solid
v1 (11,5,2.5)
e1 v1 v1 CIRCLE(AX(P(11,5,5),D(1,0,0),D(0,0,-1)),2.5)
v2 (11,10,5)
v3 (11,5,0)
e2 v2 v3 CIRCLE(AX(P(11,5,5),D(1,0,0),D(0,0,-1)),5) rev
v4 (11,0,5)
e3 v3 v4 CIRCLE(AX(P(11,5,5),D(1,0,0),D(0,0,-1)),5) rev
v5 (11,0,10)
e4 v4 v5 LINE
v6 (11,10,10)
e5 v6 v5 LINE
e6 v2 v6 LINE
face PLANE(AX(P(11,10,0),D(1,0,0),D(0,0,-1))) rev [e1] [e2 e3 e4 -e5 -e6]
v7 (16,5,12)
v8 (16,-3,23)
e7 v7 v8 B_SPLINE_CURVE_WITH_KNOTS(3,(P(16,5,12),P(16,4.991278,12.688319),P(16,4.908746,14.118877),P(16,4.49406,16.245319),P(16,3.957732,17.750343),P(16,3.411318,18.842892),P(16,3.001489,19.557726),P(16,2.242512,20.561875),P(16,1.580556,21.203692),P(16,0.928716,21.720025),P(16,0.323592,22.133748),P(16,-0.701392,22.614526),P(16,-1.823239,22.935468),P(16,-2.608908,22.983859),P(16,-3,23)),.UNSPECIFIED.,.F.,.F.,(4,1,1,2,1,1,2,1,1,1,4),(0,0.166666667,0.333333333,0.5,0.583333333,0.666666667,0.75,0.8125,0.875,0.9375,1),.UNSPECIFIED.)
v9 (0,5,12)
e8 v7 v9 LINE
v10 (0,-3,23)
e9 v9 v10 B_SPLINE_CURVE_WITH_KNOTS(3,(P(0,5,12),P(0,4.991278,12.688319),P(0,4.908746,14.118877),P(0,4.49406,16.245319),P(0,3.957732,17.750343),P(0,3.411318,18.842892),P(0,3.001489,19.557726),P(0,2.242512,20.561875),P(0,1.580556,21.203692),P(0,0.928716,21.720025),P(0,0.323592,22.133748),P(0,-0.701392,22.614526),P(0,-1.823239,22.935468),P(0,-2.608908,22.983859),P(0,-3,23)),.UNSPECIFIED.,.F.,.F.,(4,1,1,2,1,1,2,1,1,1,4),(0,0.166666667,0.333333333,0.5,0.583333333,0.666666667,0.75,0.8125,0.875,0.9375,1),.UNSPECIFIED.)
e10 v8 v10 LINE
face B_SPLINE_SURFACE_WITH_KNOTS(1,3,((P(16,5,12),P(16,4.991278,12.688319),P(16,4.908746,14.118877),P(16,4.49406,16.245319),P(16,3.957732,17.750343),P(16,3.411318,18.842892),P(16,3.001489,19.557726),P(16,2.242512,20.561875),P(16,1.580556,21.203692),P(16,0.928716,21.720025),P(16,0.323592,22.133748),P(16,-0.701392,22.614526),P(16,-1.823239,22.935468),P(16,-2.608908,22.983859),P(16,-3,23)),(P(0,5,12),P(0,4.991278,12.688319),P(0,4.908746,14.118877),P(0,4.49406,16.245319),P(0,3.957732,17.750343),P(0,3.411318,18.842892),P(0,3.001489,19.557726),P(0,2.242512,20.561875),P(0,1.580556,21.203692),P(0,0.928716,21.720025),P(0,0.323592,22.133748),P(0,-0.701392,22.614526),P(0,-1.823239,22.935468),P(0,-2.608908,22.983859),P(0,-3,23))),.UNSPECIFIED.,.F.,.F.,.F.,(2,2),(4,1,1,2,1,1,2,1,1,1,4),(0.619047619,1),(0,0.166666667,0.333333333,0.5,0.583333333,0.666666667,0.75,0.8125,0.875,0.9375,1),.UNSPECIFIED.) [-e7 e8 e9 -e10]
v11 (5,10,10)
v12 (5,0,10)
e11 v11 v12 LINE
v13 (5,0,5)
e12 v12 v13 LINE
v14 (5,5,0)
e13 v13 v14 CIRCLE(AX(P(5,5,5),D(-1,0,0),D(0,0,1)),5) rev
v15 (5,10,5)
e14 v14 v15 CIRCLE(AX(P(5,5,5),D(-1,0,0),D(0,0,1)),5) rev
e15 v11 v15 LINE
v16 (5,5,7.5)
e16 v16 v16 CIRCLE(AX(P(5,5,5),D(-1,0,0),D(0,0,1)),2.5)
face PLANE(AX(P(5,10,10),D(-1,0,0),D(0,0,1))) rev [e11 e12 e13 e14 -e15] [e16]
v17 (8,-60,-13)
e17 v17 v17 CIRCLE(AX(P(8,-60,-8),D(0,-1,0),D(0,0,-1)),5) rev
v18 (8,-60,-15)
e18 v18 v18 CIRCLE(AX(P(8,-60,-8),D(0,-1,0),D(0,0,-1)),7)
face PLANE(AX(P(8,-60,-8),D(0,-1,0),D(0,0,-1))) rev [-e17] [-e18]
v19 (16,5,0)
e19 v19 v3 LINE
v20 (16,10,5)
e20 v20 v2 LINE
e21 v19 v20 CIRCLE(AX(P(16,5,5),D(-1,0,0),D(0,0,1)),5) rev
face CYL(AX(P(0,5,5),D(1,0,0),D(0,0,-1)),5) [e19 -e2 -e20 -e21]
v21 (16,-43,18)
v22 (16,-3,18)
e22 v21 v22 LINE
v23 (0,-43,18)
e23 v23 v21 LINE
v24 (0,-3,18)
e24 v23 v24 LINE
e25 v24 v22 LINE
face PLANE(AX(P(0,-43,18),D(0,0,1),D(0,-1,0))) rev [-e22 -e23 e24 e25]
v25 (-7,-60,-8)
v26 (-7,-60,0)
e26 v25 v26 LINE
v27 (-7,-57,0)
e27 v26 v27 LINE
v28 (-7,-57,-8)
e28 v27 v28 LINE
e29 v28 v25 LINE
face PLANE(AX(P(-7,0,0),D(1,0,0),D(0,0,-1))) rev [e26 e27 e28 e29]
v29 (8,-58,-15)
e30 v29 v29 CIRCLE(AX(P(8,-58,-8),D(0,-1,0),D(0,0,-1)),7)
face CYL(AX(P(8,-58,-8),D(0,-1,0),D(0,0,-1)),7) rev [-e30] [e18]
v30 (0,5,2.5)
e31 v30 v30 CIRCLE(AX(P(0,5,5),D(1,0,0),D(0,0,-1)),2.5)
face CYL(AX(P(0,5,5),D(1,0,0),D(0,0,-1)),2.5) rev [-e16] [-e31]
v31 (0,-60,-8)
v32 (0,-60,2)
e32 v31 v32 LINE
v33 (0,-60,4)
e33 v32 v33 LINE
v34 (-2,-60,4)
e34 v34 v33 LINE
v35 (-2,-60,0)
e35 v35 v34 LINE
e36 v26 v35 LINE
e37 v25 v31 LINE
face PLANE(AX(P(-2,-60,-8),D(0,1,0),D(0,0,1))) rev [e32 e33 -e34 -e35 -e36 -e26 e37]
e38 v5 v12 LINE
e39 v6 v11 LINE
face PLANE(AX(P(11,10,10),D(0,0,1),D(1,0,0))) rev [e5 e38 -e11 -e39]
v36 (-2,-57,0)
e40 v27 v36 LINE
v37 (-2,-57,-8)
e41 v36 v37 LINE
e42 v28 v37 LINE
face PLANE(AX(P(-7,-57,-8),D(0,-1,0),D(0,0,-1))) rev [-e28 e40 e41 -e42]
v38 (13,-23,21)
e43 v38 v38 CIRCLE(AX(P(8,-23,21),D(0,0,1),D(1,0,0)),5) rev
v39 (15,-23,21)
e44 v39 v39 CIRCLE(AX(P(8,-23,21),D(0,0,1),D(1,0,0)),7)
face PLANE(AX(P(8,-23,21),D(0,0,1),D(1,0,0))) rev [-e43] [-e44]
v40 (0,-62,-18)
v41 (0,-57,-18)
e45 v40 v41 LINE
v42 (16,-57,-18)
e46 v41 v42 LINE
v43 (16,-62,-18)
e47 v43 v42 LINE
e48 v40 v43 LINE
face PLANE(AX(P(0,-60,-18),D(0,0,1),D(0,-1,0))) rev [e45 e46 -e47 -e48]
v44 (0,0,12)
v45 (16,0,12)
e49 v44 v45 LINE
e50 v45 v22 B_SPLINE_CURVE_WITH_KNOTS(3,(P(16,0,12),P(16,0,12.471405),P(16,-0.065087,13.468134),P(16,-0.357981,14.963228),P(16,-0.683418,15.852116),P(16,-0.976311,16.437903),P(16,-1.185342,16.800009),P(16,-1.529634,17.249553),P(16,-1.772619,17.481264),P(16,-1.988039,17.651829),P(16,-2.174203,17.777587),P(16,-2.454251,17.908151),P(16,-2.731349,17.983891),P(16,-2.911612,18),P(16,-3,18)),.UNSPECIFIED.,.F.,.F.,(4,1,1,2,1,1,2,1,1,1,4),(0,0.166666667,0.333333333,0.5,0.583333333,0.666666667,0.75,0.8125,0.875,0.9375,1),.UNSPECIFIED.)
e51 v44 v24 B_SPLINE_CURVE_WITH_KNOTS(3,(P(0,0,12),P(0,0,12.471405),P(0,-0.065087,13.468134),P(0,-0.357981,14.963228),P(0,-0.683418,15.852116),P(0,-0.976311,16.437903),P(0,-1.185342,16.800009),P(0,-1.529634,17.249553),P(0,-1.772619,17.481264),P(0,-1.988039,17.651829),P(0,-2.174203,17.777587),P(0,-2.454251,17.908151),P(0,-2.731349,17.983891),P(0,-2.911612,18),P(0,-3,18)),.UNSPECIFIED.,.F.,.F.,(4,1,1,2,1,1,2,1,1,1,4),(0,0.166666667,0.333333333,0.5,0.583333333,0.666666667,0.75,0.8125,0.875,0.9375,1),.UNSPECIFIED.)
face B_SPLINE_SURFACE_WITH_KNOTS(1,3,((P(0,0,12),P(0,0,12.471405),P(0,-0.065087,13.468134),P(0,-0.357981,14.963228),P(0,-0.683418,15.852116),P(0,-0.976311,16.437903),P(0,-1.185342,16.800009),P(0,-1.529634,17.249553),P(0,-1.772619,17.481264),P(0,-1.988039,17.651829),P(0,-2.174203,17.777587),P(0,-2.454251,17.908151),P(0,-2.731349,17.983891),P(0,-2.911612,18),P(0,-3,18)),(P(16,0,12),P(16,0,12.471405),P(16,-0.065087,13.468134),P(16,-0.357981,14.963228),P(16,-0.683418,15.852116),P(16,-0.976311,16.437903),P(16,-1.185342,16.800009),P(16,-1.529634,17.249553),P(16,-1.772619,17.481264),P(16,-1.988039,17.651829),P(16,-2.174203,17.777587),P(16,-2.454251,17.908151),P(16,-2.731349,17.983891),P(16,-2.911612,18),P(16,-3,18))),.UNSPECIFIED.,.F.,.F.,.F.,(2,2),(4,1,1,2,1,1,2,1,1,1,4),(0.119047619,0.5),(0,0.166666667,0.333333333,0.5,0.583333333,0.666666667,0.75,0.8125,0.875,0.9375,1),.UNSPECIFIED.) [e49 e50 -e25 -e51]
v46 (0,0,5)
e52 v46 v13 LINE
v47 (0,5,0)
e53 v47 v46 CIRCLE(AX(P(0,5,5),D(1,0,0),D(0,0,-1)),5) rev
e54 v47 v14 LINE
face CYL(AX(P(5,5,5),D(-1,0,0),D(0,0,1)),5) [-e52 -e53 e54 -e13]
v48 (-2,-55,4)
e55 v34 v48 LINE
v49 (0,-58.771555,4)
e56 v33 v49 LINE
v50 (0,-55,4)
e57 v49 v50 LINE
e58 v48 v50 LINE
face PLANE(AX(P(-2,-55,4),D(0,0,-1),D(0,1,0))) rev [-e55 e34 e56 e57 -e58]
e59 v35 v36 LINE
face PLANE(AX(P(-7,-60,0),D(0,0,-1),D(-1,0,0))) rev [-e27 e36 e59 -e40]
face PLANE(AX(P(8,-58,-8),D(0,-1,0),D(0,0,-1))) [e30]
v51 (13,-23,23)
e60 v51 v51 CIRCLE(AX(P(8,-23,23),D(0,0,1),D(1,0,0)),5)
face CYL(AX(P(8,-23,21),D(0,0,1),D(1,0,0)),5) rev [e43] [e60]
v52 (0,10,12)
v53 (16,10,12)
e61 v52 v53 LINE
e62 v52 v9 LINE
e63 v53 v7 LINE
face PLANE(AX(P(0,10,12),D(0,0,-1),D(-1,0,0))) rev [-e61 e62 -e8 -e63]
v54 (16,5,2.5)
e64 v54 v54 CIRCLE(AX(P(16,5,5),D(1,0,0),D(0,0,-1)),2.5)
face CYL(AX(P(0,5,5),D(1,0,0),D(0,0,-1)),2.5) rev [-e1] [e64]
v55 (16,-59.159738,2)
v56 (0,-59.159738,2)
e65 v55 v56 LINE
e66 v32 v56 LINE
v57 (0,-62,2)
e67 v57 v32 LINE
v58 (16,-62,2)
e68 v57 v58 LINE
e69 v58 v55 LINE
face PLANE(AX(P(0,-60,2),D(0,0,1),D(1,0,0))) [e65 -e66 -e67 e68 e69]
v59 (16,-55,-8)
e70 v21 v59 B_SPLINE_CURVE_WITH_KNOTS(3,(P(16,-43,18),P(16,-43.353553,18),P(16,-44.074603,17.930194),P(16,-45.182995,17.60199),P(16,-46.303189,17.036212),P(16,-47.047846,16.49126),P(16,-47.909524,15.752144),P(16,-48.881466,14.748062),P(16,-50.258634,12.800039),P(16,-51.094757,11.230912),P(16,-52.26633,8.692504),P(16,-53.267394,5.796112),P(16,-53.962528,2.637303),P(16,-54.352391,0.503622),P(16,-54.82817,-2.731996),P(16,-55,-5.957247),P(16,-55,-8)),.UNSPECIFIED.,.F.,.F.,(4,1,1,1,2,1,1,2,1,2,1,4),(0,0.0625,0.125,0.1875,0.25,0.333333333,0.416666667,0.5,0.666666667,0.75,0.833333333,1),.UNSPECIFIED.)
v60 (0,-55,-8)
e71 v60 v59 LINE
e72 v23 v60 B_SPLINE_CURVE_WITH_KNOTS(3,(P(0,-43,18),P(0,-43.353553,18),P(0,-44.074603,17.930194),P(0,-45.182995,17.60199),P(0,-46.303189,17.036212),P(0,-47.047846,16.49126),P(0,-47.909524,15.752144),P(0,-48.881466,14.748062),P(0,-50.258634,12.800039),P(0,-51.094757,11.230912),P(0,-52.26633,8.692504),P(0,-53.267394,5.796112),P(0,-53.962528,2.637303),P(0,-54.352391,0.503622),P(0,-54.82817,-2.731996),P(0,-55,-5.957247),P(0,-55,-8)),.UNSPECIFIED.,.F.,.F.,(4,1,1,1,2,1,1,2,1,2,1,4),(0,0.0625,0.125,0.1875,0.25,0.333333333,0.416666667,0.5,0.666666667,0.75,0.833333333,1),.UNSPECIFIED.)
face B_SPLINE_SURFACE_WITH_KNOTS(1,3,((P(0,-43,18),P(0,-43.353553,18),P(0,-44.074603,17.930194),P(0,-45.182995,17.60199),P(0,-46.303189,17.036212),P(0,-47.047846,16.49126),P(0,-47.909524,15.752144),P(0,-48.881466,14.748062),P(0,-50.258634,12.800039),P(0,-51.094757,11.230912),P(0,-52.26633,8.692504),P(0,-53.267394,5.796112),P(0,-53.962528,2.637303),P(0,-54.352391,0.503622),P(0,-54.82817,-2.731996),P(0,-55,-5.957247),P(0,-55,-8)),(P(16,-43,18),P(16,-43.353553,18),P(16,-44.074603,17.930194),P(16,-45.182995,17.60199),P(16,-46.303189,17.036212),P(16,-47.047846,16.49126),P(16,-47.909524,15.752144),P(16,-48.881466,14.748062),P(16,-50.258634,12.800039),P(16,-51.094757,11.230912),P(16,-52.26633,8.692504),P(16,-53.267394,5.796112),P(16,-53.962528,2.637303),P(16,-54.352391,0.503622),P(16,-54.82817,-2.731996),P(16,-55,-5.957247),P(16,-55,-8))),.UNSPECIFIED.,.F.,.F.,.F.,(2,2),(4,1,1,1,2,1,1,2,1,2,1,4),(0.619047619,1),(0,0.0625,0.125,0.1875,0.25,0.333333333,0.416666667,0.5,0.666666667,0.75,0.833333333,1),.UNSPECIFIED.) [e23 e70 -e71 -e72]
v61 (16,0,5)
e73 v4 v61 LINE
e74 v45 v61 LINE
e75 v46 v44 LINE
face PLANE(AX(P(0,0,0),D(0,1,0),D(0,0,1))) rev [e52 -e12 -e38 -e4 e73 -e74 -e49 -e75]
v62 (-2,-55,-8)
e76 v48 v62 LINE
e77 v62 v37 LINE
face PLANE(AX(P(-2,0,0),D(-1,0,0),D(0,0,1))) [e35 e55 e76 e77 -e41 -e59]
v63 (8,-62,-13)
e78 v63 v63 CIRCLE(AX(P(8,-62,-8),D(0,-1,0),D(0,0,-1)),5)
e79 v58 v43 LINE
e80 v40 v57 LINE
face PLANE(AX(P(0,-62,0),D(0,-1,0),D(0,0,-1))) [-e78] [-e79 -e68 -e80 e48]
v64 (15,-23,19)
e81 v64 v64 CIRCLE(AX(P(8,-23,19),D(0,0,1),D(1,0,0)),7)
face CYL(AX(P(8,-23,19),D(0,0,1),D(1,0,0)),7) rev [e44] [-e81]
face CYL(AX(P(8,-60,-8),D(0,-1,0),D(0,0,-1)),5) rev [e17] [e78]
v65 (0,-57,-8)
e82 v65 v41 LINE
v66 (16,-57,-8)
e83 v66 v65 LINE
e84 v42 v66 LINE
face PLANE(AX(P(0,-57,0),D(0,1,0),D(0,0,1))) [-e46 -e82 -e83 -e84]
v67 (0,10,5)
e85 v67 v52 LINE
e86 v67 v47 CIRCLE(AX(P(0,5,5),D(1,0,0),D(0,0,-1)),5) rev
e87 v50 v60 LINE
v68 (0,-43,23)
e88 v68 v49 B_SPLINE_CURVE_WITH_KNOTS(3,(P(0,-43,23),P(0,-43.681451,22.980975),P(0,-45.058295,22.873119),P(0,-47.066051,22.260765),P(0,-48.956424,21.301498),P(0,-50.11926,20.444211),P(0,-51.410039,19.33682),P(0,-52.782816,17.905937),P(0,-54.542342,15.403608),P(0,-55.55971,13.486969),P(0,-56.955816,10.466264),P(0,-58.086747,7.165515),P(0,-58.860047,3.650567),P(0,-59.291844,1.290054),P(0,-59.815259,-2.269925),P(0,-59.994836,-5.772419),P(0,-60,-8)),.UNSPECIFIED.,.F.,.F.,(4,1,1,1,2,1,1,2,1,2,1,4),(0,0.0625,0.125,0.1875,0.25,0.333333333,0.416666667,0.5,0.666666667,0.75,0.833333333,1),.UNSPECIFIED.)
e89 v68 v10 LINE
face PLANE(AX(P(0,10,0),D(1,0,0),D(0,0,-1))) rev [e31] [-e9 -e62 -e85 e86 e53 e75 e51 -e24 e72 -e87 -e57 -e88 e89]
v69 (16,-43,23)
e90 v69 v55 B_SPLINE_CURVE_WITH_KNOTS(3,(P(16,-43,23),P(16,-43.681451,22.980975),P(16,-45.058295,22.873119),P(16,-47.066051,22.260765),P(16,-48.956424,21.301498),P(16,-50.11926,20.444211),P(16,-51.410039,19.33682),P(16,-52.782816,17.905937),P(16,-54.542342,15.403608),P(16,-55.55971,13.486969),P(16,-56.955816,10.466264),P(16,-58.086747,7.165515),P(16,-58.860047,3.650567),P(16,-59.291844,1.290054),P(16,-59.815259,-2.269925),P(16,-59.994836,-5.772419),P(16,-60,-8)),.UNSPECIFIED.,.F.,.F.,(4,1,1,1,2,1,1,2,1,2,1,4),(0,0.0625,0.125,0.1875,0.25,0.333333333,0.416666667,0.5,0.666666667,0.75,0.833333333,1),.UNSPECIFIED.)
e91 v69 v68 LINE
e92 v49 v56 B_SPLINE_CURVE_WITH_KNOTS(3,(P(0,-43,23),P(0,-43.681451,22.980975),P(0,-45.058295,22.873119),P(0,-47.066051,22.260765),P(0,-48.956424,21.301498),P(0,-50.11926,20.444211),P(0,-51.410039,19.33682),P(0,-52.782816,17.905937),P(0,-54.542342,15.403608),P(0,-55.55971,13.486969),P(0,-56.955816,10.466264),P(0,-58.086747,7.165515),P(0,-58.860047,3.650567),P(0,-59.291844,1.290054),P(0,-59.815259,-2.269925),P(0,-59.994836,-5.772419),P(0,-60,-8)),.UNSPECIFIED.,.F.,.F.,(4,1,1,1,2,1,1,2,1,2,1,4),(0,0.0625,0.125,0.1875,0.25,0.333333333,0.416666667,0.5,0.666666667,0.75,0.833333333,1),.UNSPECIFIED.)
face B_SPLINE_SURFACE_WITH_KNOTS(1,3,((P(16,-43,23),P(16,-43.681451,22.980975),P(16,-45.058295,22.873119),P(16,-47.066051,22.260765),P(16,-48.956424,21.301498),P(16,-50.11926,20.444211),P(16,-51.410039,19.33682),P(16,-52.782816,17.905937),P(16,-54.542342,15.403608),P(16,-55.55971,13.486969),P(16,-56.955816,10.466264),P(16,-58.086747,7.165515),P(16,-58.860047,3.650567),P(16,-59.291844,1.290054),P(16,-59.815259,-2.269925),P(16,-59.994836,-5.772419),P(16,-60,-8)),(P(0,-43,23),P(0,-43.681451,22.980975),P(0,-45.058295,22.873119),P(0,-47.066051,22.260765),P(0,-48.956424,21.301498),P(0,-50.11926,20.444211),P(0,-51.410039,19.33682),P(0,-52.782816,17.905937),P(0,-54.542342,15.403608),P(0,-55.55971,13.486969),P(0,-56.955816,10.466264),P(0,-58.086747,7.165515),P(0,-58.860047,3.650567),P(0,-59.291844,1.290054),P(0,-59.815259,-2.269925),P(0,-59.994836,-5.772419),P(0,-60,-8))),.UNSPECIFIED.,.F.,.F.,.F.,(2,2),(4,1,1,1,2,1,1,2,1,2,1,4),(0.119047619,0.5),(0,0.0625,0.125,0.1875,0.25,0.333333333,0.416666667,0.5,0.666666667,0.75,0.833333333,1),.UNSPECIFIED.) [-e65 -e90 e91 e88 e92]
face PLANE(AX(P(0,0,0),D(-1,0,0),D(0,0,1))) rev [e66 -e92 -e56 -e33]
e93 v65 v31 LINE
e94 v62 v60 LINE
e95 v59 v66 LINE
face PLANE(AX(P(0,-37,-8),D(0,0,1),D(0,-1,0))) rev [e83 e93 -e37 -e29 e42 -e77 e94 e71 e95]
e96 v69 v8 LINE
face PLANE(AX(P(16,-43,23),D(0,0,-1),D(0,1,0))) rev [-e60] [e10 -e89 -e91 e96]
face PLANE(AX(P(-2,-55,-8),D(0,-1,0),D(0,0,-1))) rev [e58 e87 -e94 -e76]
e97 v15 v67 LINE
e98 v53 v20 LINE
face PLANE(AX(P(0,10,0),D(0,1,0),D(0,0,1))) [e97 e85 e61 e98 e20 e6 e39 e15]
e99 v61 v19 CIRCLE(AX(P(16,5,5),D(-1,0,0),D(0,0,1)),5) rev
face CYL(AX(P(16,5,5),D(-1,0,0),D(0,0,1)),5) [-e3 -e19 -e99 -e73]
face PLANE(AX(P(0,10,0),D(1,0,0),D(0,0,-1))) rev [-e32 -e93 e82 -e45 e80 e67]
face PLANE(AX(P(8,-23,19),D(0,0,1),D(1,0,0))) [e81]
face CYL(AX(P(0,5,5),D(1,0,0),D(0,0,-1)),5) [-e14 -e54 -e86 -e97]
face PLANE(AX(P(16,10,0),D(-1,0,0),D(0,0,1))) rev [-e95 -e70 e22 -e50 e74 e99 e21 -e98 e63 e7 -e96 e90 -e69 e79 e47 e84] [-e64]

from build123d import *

# Parameters (mm, degrees)
BOSS_EXTRUDE2_DEPTH     = 10
CUT_EXTRUDE1_DEPTH      = 20.104973175
CUT_EXTRUDE1_DEPTH_BACK = 20.104973175
SKETCH3_R               = 2.5
SWEEP2_DEPTH            = 16
SKETCH6_W               = 16
SKETCH6_H               = 5
BOSS_EXTRUDE3_DEPTH     = 40
SWEEP4_DEPTH            = 16
SKETCH11_R              = 5
CUT_EXTRUDE2_DEPTH      = 2
SKETCH13_R              = 7
CUT_EXTRUDE3_DEPTH      = 2
BOSS_EXTRUDE6_START     = -2
BOSS_EXTRUDE6_DEPTH     = 5
SKETCH14_R              = 5
CUT_EXTRUDE4_DEPTH      = 2
SKETCH15_R              = 7
CUT_EXTRUDE5_DEPTH      = 2
SKETCH17_W              = 12
SKETCH17_H              = 5
BOSS_EXTRUDE8_DEPTH     = 2
SKETCH18_W              = 8
SKETCH18_H              = 3
BOSS_EXTRUDE9_DEPTH     = 5
FILLET1_R               = 5


# Read off the part's stored shape, not the designer's step: Sweep2, Sweep4
with BuildPart() as part:
    # Sketch1 → Boss-Extrude2 (new body)
    with BuildSketch(Plane(origin=(0, 0, 0), x_dir=(1, 0, 0), z_dir=(0, 1, 0))):
        Polygon((16, 0), (11, 0), (11, -10), (5, -10), (5, 0), (0, 0), (0, -12), (16, -12), align=None)
    extrude(amount=BOSS_EXTRUDE2_DEPTH)

    # Sketch3 → Cut-Extrude1 (cut, two sides: drawn at the far end of the back side and taken through both)
    with BuildSketch(Plane(origin=(5, 0, 0), x_dir=(0, 0, -1), z_dir=(1, 0, 0)).offset(-CUT_EXTRUDE1_DEPTH_BACK)):
        with Locations((-5, 5)):
            Circle(SKETCH3_R)
    extrude(amount=CUT_EXTRUDE1_DEPTH + CUT_EXTRUDE1_DEPTH_BACK, mode=Mode.SUBTRACT)

    # Sweep2 outline → Sweep2 (add)
    with BuildSketch(Plane.YZ):
        with BuildLine():
            Line((0, 12), (5, 12))
            add(Edge.make_bspline(
                [(5, 12), (4.991277814, 12.688318981), (4.908746061, 14.118877097), (4.494059835, 16.245318685), (3.957732254, 17.750342889), (3.411318321, 18.842891552), (3.001489478, 19.557726126), (2.242511991, 20.561874881), (1.580556332, 21.203692416), (0.928716087, 21.720024552), (0.323591986, 22.133748121), (-0.701392406, 22.614526195), (-1.823238843, 22.935468381), (-2.608908218, 22.983859145), (-3, 23)],
                knots=[0, 0, 0, 0, 0.166666667, 0.333333333, 0.5, 0.5, 0.583333333, 0.666666667, 0.75, 0.75, 0.8125, 0.875, 0.9375, 1, 1, 1, 1], degree=3))
            Line((-3, 23), (-3, 18))
            add(Edge.make_bspline(
                [(0, 12), (0, 12.471404521), (-0.065087382, 13.468133715), (-0.357980601, 14.963227506), (-0.683417511, 15.852116395), (-0.976310729, 16.437902833), (-1.185341525, 16.80000901), (-1.529633622, 17.249552677), (-1.772618921, 17.481263886), (-1.988038584, 17.651829247), (-2.174202639, 17.777587461), (-2.454251279, 17.908151493), (-2.731349145, 17.983890946), (-2.911611652, 18), (-3, 18)],
                knots=[0, 0, 0, 0, 0.166666667, 0.333333333, 0.5, 0.5, 0.583333333, 0.666666667, 0.75, 0.75, 0.8125, 0.875, 0.9375, 1, 1, 1, 1], degree=3))
        make_face()
    extrude(amount=SWEEP2_DEPTH)

    # Sketch6 → Boss-Extrude3 (add)
    with BuildSketch(Plane.XZ.offset(3)):
        with Locations((8, 20.5)):
            Rectangle(SKETCH6_W, SKETCH6_H)
    extrude(amount=BOSS_EXTRUDE3_DEPTH)

    # Sweep4 outline → Sweep4 (add)
    with BuildSketch(Plane.YZ):
        with BuildLine():
            add(Edge.make_bspline(
                [(-43, 18), (-43.353553391, 18), (-44.07460342, 17.930194099), (-45.182994884, 17.601989805), (-46.303189443, 17.036212331), (-47.047845664, 16.491260068), (-47.909524316, 15.752143507), (-48.881465514, 14.748061599), (-50.258633898, 12.800039043), (-51.094757082, 11.230912276), (-52.266329958, 8.69250438), (-53.267394144, 5.796111577), (-53.962527772, 2.637302685), (-54.352391453, 0.503622212), (-54.828170089, -2.731995713), (-55, -5.957247077), (-55, -8)],
                knots=[0, 0, 0, 0, 0.0625, 0.125, 0.1875, 0.25, 0.25, 0.333333333, 0.416666667, 0.5, 0.5, 0.666666667, 0.75, 0.75, 0.833333333, 1, 1, 1, 1], degree=3))
            Line((-43, 18), (-43, 23))
            add(Edge.make_bspline(
                [(-43, 23), (-43.681450726, 22.980975055), (-45.058295426, 22.873119263), (-47.066050979, 22.260765234), (-48.956424122, 21.301498195), (-50.119260314, 20.44421056), (-51.410038967, 19.336819996), (-52.782815769, 17.905936964), (-54.54234243, 15.403608104), (-55.559709648, 13.48696901), (-56.955815594, 10.466263575), (-58.086746894, 7.16551514), (-58.86004663, 3.650567343), (-59.291844345, 1.290053693), (-59.815258978, -2.269924856), (-59.994835555, -5.772418734), (-60, -8)],
                knots=[0, 0, 0, 0, 0.0625, 0.125, 0.1875, 0.25, 0.25, 0.333333333, 0.416666667, 0.5, 0.5, 0.666666667, 0.75, 0.75, 0.833333333, 1, 1, 1, 1], degree=3))
            Line((-60, -8), (-55, -8))
        make_face()
    extrude(amount=SWEEP4_DEPTH)

    # Sketch11 → Cut-Extrude2 (cut)
    with BuildSketch(Plane.XY.offset(23)):
        with Locations((8, -23)):
            Circle(SKETCH11_R)
    extrude(amount=-CUT_EXTRUDE2_DEPTH, mode=Mode.SUBTRACT)

    # Sketch13 → Cut-Extrude3 (cut)
    with BuildSketch(Plane.XY.offset(21)):
        with Locations((8, -23)):
            Circle(SKETCH13_R)
    extrude(amount=-CUT_EXTRUDE3_DEPTH, mode=Mode.SUBTRACT)

    # 3DSketch1 → Boss-Extrude6 (add)
    with BuildSketch(Plane(origin=(0, -60, -8), x_dir=(0.8479983040050881, 0, 0.52999894000318), z_dir=(0, 1, 0)).offset(BOSS_EXTRUDE6_START)):
        Polygon((0, 0), (13.567972864, 8.47998304), (18.867962264, 0), (5.2999894, -8.47998304), align=None)
    boss_extrude6 = extrude(amount=BOSS_EXTRUDE6_DEPTH)

    # Mirror1: Boss-Extrude6 across plane
    add(boss_extrude6.mirror(Plane(origin=(0, -37, -8), x_dir=(1, 0, 0), z_dir=(0, 0, 1))))

    # Sketch14 → Cut-Extrude4 (cut)
    with BuildSketch(Plane.XZ.offset(62)):
        with Locations(Location((8, -8, 0), (0, 0, 270))):
            Circle(SKETCH14_R)
    extrude(amount=-CUT_EXTRUDE4_DEPTH, mode=Mode.SUBTRACT)

    # Sketch15 → Cut-Extrude5 (cut)
    with BuildSketch(Plane.XZ.offset(60)):
        with Locations(Location((8, -8, 0), (0, 0, 270))):
            Circle(SKETCH15_R)
    extrude(amount=-CUT_EXTRUDE5_DEPTH, mode=Mode.SUBTRACT)

    # Sketch17 → Boss-Extrude8 (add)
    with BuildSketch(Plane.ZY):
        with Locations((-2, -57.5)):
            Rectangle(SKETCH17_W, SKETCH17_H)
    extrude(amount=BOSS_EXTRUDE8_DEPTH)

    # Sketch18 → Boss-Extrude9 (add)
    with BuildSketch(Plane.ZY.offset(2)):
        with Locations((-4, -58.5)):
            Rectangle(SKETCH18_W, SKETCH18_H)
    extrude(amount=BOSS_EXTRUDE9_DEPTH)

    # Fillet1
    fillet1_edges = [part.edges().sort_by_distance(p)[0] for p in [
        (13.5, 10, 0),
        (13.5, 0, 0),
        (2.5, 0, 0),
        (2.5, 10, 0),
    ]]
    fillet(fillet1_edges, radius=FILLET1_R - 0.0001)  # a hair under: the kernel refuses the full size


solid = part.part
